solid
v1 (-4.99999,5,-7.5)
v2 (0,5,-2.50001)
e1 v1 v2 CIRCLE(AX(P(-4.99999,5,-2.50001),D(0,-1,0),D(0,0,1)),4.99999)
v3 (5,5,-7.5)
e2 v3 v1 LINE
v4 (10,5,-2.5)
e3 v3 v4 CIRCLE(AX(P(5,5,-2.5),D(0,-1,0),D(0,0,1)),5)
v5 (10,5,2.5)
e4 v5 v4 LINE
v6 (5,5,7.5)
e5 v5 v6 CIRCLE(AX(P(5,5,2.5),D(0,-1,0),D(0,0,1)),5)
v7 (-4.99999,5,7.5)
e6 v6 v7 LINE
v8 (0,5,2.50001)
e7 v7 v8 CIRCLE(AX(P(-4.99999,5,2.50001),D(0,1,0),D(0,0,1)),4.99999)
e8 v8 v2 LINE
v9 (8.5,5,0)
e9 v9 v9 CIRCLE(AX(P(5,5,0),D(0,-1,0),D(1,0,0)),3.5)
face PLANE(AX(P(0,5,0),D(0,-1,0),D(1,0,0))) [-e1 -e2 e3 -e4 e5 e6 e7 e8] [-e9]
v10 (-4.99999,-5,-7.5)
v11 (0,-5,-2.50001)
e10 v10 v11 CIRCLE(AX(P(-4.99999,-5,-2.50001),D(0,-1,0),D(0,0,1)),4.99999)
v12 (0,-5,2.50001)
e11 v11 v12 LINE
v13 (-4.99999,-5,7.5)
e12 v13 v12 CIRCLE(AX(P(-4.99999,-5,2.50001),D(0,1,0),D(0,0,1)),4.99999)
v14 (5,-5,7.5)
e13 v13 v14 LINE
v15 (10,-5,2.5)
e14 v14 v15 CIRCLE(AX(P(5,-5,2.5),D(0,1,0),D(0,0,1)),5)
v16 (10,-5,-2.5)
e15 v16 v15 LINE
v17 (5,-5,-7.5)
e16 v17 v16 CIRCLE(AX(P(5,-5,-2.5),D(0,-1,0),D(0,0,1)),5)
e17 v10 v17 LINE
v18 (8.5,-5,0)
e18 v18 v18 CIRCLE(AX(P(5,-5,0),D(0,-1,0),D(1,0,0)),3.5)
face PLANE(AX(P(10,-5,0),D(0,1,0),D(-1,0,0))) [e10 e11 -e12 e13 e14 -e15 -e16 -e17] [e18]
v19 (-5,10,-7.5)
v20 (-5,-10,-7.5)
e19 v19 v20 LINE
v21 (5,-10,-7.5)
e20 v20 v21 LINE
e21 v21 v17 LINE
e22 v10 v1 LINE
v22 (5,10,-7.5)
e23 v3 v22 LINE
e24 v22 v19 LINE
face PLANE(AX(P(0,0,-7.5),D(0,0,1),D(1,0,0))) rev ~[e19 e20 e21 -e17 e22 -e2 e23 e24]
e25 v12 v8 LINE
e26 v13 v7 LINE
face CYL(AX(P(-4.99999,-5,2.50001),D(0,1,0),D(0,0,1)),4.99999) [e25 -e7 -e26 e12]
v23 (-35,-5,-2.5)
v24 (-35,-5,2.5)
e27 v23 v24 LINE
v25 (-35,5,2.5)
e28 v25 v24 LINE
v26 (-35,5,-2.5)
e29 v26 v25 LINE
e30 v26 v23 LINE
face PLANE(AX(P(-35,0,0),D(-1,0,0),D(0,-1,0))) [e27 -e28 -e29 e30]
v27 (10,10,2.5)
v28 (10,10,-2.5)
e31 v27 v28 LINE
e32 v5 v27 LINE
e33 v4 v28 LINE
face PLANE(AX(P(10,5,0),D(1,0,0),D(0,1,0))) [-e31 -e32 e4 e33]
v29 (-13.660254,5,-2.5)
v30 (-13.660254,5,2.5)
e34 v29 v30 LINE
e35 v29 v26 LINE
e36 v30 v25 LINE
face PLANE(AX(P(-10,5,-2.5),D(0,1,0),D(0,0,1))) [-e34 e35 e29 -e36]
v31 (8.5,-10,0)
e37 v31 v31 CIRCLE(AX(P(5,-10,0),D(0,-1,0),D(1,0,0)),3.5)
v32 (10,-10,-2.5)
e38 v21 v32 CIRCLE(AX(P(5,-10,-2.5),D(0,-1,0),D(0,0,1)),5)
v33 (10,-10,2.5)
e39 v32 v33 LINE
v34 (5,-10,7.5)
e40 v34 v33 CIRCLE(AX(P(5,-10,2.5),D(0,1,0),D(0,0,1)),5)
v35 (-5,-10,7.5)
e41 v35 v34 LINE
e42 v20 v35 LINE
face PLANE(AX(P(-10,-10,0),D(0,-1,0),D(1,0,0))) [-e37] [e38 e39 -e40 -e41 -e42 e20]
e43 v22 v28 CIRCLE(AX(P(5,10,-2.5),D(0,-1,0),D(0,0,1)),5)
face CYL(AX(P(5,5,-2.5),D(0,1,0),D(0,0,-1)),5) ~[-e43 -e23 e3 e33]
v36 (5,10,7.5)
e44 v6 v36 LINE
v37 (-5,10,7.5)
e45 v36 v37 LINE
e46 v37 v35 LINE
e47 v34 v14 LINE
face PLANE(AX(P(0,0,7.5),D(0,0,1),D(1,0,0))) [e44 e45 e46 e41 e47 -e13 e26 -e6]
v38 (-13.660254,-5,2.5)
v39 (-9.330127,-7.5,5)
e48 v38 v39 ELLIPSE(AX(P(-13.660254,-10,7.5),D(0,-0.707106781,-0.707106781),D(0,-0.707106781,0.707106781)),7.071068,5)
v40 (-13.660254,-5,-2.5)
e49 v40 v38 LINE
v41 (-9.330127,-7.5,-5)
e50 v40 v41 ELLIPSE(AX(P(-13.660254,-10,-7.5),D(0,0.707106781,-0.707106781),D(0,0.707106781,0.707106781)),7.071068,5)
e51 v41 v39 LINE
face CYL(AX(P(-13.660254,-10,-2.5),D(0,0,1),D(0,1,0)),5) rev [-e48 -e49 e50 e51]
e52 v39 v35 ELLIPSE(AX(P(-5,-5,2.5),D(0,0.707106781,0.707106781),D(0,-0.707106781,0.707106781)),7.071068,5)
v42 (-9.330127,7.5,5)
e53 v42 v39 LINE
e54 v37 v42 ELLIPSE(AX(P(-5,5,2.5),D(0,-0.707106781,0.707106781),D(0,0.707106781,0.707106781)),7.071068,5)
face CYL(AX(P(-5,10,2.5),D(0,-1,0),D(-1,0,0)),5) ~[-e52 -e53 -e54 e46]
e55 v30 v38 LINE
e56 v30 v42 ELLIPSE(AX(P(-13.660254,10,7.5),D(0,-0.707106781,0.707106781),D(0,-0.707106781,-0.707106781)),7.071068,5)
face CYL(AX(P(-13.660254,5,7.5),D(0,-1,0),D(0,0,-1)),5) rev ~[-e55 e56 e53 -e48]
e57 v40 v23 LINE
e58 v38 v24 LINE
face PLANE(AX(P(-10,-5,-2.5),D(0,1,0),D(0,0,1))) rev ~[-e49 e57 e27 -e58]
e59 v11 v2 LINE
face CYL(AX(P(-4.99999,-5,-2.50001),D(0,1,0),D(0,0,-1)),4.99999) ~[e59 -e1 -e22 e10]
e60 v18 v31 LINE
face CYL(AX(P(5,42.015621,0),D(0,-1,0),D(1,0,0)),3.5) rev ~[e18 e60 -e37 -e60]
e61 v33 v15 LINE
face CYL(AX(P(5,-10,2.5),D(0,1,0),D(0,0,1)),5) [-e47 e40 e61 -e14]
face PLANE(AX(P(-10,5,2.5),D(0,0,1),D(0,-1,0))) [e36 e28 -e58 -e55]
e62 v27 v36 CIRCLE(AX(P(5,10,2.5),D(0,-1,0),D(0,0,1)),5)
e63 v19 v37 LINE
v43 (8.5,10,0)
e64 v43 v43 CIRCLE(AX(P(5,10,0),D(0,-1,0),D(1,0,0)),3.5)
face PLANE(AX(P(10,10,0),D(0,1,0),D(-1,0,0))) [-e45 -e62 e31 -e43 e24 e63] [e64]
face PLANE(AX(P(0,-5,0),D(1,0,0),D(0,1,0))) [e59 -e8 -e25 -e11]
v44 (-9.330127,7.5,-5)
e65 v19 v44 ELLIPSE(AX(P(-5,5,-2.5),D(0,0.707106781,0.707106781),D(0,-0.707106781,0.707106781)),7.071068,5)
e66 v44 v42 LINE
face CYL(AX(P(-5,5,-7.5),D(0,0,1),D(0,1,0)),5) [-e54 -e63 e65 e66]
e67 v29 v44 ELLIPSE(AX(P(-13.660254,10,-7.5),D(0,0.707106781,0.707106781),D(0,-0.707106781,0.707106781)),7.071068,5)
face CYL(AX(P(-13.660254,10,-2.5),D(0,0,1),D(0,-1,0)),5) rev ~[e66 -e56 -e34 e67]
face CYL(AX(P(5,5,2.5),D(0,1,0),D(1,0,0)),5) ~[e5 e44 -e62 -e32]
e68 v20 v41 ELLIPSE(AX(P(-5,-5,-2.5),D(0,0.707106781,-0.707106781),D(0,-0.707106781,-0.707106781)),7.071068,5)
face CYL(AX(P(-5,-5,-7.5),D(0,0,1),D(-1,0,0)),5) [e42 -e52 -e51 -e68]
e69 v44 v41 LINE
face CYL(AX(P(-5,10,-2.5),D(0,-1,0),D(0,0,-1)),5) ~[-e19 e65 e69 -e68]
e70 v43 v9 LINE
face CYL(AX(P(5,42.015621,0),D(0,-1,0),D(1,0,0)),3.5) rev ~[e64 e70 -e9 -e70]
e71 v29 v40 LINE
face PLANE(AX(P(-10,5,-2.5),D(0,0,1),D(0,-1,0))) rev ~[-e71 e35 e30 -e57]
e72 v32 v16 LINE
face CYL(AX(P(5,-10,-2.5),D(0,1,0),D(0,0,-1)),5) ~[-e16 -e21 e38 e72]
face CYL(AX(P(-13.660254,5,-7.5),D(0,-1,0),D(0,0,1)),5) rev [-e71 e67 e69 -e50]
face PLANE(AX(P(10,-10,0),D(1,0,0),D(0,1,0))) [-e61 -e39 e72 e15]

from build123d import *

# Parameters (mm, degrees)
F1_DEPTH = 7.5
F3_D     = 7
F4_R     = 5
F5_R     = 4.99999
F6_W     = 10
F6_H     = 5
F7_DEPTH = 25
F8_R     = 5


# Not quite as in the source:
# - a fillet or chamfer is up to 0.001 mm smaller than in the source, because OpenCascade refuses the exact size


with BuildPart() as f1:
    # F0 (on Top) → F1 (new body, symmetric)
    with BuildSketch(Plane.XY):
        Polygon((10, 10), (-10, 10), (-10, -10), (10, -10), (10, -5), (0, -5), (0, 5), (10, 5), align=None)
    extrude(amount=F1_DEPTH, both=True)

    # F3 (through all)
    with Locations(Plane(origin=(0, 10, 0), x_dir=(-1, 0, 0), z_dir=(0, 1, 0))):
        with Locations((-5, 0)):
            Hole(F3_D / 2)

    # F4
    f4_edges = [f1.edges().sort_by_distance(p)[0] for p in [
        (10, 7.5, 7.5),
        (10, 7.5, -7.5),
        (10, -7.5, 7.5),
        (10, -7.5, -7.5),
        (-10, 10, 0),
        (-10, 0, -7.5),
        (-10, -10, 0),
        (-10, 0, 7.5),
    ]]
    fillet(f4_edges, radius=F4_R)

    # F5 (radius 5 in the source; OpenCascade refuses exactly that, so slightly less here)
    f5_edges = [f1.edges().sort_by_distance(p)[0] for p in [
        (0, 0, 7.5),
        (0, 0, -7.5),
    ]]
    fillet(f5_edges, radius=F5_R)

    # F6 (on face) → F7 (join)
    with BuildSketch(Plane(origin=(-10, 0, 0), x_dir=(0, -1, 0), z_dir=(-1, 0, 0))):
        Rectangle(F6_W, F6_H)
    extrude(amount=F7_DEPTH)

    # F8
    f8_edges = [f1.edges().sort_by_distance(p)[0] for p in [
        (-10, 0, 2.5),
        (-10, -5, 0),
        (-10, 0, -2.5),
        (-10, 5, 0),
    ]]
    fillet(f8_edges, radius=F8_R)


solid = f1.part
